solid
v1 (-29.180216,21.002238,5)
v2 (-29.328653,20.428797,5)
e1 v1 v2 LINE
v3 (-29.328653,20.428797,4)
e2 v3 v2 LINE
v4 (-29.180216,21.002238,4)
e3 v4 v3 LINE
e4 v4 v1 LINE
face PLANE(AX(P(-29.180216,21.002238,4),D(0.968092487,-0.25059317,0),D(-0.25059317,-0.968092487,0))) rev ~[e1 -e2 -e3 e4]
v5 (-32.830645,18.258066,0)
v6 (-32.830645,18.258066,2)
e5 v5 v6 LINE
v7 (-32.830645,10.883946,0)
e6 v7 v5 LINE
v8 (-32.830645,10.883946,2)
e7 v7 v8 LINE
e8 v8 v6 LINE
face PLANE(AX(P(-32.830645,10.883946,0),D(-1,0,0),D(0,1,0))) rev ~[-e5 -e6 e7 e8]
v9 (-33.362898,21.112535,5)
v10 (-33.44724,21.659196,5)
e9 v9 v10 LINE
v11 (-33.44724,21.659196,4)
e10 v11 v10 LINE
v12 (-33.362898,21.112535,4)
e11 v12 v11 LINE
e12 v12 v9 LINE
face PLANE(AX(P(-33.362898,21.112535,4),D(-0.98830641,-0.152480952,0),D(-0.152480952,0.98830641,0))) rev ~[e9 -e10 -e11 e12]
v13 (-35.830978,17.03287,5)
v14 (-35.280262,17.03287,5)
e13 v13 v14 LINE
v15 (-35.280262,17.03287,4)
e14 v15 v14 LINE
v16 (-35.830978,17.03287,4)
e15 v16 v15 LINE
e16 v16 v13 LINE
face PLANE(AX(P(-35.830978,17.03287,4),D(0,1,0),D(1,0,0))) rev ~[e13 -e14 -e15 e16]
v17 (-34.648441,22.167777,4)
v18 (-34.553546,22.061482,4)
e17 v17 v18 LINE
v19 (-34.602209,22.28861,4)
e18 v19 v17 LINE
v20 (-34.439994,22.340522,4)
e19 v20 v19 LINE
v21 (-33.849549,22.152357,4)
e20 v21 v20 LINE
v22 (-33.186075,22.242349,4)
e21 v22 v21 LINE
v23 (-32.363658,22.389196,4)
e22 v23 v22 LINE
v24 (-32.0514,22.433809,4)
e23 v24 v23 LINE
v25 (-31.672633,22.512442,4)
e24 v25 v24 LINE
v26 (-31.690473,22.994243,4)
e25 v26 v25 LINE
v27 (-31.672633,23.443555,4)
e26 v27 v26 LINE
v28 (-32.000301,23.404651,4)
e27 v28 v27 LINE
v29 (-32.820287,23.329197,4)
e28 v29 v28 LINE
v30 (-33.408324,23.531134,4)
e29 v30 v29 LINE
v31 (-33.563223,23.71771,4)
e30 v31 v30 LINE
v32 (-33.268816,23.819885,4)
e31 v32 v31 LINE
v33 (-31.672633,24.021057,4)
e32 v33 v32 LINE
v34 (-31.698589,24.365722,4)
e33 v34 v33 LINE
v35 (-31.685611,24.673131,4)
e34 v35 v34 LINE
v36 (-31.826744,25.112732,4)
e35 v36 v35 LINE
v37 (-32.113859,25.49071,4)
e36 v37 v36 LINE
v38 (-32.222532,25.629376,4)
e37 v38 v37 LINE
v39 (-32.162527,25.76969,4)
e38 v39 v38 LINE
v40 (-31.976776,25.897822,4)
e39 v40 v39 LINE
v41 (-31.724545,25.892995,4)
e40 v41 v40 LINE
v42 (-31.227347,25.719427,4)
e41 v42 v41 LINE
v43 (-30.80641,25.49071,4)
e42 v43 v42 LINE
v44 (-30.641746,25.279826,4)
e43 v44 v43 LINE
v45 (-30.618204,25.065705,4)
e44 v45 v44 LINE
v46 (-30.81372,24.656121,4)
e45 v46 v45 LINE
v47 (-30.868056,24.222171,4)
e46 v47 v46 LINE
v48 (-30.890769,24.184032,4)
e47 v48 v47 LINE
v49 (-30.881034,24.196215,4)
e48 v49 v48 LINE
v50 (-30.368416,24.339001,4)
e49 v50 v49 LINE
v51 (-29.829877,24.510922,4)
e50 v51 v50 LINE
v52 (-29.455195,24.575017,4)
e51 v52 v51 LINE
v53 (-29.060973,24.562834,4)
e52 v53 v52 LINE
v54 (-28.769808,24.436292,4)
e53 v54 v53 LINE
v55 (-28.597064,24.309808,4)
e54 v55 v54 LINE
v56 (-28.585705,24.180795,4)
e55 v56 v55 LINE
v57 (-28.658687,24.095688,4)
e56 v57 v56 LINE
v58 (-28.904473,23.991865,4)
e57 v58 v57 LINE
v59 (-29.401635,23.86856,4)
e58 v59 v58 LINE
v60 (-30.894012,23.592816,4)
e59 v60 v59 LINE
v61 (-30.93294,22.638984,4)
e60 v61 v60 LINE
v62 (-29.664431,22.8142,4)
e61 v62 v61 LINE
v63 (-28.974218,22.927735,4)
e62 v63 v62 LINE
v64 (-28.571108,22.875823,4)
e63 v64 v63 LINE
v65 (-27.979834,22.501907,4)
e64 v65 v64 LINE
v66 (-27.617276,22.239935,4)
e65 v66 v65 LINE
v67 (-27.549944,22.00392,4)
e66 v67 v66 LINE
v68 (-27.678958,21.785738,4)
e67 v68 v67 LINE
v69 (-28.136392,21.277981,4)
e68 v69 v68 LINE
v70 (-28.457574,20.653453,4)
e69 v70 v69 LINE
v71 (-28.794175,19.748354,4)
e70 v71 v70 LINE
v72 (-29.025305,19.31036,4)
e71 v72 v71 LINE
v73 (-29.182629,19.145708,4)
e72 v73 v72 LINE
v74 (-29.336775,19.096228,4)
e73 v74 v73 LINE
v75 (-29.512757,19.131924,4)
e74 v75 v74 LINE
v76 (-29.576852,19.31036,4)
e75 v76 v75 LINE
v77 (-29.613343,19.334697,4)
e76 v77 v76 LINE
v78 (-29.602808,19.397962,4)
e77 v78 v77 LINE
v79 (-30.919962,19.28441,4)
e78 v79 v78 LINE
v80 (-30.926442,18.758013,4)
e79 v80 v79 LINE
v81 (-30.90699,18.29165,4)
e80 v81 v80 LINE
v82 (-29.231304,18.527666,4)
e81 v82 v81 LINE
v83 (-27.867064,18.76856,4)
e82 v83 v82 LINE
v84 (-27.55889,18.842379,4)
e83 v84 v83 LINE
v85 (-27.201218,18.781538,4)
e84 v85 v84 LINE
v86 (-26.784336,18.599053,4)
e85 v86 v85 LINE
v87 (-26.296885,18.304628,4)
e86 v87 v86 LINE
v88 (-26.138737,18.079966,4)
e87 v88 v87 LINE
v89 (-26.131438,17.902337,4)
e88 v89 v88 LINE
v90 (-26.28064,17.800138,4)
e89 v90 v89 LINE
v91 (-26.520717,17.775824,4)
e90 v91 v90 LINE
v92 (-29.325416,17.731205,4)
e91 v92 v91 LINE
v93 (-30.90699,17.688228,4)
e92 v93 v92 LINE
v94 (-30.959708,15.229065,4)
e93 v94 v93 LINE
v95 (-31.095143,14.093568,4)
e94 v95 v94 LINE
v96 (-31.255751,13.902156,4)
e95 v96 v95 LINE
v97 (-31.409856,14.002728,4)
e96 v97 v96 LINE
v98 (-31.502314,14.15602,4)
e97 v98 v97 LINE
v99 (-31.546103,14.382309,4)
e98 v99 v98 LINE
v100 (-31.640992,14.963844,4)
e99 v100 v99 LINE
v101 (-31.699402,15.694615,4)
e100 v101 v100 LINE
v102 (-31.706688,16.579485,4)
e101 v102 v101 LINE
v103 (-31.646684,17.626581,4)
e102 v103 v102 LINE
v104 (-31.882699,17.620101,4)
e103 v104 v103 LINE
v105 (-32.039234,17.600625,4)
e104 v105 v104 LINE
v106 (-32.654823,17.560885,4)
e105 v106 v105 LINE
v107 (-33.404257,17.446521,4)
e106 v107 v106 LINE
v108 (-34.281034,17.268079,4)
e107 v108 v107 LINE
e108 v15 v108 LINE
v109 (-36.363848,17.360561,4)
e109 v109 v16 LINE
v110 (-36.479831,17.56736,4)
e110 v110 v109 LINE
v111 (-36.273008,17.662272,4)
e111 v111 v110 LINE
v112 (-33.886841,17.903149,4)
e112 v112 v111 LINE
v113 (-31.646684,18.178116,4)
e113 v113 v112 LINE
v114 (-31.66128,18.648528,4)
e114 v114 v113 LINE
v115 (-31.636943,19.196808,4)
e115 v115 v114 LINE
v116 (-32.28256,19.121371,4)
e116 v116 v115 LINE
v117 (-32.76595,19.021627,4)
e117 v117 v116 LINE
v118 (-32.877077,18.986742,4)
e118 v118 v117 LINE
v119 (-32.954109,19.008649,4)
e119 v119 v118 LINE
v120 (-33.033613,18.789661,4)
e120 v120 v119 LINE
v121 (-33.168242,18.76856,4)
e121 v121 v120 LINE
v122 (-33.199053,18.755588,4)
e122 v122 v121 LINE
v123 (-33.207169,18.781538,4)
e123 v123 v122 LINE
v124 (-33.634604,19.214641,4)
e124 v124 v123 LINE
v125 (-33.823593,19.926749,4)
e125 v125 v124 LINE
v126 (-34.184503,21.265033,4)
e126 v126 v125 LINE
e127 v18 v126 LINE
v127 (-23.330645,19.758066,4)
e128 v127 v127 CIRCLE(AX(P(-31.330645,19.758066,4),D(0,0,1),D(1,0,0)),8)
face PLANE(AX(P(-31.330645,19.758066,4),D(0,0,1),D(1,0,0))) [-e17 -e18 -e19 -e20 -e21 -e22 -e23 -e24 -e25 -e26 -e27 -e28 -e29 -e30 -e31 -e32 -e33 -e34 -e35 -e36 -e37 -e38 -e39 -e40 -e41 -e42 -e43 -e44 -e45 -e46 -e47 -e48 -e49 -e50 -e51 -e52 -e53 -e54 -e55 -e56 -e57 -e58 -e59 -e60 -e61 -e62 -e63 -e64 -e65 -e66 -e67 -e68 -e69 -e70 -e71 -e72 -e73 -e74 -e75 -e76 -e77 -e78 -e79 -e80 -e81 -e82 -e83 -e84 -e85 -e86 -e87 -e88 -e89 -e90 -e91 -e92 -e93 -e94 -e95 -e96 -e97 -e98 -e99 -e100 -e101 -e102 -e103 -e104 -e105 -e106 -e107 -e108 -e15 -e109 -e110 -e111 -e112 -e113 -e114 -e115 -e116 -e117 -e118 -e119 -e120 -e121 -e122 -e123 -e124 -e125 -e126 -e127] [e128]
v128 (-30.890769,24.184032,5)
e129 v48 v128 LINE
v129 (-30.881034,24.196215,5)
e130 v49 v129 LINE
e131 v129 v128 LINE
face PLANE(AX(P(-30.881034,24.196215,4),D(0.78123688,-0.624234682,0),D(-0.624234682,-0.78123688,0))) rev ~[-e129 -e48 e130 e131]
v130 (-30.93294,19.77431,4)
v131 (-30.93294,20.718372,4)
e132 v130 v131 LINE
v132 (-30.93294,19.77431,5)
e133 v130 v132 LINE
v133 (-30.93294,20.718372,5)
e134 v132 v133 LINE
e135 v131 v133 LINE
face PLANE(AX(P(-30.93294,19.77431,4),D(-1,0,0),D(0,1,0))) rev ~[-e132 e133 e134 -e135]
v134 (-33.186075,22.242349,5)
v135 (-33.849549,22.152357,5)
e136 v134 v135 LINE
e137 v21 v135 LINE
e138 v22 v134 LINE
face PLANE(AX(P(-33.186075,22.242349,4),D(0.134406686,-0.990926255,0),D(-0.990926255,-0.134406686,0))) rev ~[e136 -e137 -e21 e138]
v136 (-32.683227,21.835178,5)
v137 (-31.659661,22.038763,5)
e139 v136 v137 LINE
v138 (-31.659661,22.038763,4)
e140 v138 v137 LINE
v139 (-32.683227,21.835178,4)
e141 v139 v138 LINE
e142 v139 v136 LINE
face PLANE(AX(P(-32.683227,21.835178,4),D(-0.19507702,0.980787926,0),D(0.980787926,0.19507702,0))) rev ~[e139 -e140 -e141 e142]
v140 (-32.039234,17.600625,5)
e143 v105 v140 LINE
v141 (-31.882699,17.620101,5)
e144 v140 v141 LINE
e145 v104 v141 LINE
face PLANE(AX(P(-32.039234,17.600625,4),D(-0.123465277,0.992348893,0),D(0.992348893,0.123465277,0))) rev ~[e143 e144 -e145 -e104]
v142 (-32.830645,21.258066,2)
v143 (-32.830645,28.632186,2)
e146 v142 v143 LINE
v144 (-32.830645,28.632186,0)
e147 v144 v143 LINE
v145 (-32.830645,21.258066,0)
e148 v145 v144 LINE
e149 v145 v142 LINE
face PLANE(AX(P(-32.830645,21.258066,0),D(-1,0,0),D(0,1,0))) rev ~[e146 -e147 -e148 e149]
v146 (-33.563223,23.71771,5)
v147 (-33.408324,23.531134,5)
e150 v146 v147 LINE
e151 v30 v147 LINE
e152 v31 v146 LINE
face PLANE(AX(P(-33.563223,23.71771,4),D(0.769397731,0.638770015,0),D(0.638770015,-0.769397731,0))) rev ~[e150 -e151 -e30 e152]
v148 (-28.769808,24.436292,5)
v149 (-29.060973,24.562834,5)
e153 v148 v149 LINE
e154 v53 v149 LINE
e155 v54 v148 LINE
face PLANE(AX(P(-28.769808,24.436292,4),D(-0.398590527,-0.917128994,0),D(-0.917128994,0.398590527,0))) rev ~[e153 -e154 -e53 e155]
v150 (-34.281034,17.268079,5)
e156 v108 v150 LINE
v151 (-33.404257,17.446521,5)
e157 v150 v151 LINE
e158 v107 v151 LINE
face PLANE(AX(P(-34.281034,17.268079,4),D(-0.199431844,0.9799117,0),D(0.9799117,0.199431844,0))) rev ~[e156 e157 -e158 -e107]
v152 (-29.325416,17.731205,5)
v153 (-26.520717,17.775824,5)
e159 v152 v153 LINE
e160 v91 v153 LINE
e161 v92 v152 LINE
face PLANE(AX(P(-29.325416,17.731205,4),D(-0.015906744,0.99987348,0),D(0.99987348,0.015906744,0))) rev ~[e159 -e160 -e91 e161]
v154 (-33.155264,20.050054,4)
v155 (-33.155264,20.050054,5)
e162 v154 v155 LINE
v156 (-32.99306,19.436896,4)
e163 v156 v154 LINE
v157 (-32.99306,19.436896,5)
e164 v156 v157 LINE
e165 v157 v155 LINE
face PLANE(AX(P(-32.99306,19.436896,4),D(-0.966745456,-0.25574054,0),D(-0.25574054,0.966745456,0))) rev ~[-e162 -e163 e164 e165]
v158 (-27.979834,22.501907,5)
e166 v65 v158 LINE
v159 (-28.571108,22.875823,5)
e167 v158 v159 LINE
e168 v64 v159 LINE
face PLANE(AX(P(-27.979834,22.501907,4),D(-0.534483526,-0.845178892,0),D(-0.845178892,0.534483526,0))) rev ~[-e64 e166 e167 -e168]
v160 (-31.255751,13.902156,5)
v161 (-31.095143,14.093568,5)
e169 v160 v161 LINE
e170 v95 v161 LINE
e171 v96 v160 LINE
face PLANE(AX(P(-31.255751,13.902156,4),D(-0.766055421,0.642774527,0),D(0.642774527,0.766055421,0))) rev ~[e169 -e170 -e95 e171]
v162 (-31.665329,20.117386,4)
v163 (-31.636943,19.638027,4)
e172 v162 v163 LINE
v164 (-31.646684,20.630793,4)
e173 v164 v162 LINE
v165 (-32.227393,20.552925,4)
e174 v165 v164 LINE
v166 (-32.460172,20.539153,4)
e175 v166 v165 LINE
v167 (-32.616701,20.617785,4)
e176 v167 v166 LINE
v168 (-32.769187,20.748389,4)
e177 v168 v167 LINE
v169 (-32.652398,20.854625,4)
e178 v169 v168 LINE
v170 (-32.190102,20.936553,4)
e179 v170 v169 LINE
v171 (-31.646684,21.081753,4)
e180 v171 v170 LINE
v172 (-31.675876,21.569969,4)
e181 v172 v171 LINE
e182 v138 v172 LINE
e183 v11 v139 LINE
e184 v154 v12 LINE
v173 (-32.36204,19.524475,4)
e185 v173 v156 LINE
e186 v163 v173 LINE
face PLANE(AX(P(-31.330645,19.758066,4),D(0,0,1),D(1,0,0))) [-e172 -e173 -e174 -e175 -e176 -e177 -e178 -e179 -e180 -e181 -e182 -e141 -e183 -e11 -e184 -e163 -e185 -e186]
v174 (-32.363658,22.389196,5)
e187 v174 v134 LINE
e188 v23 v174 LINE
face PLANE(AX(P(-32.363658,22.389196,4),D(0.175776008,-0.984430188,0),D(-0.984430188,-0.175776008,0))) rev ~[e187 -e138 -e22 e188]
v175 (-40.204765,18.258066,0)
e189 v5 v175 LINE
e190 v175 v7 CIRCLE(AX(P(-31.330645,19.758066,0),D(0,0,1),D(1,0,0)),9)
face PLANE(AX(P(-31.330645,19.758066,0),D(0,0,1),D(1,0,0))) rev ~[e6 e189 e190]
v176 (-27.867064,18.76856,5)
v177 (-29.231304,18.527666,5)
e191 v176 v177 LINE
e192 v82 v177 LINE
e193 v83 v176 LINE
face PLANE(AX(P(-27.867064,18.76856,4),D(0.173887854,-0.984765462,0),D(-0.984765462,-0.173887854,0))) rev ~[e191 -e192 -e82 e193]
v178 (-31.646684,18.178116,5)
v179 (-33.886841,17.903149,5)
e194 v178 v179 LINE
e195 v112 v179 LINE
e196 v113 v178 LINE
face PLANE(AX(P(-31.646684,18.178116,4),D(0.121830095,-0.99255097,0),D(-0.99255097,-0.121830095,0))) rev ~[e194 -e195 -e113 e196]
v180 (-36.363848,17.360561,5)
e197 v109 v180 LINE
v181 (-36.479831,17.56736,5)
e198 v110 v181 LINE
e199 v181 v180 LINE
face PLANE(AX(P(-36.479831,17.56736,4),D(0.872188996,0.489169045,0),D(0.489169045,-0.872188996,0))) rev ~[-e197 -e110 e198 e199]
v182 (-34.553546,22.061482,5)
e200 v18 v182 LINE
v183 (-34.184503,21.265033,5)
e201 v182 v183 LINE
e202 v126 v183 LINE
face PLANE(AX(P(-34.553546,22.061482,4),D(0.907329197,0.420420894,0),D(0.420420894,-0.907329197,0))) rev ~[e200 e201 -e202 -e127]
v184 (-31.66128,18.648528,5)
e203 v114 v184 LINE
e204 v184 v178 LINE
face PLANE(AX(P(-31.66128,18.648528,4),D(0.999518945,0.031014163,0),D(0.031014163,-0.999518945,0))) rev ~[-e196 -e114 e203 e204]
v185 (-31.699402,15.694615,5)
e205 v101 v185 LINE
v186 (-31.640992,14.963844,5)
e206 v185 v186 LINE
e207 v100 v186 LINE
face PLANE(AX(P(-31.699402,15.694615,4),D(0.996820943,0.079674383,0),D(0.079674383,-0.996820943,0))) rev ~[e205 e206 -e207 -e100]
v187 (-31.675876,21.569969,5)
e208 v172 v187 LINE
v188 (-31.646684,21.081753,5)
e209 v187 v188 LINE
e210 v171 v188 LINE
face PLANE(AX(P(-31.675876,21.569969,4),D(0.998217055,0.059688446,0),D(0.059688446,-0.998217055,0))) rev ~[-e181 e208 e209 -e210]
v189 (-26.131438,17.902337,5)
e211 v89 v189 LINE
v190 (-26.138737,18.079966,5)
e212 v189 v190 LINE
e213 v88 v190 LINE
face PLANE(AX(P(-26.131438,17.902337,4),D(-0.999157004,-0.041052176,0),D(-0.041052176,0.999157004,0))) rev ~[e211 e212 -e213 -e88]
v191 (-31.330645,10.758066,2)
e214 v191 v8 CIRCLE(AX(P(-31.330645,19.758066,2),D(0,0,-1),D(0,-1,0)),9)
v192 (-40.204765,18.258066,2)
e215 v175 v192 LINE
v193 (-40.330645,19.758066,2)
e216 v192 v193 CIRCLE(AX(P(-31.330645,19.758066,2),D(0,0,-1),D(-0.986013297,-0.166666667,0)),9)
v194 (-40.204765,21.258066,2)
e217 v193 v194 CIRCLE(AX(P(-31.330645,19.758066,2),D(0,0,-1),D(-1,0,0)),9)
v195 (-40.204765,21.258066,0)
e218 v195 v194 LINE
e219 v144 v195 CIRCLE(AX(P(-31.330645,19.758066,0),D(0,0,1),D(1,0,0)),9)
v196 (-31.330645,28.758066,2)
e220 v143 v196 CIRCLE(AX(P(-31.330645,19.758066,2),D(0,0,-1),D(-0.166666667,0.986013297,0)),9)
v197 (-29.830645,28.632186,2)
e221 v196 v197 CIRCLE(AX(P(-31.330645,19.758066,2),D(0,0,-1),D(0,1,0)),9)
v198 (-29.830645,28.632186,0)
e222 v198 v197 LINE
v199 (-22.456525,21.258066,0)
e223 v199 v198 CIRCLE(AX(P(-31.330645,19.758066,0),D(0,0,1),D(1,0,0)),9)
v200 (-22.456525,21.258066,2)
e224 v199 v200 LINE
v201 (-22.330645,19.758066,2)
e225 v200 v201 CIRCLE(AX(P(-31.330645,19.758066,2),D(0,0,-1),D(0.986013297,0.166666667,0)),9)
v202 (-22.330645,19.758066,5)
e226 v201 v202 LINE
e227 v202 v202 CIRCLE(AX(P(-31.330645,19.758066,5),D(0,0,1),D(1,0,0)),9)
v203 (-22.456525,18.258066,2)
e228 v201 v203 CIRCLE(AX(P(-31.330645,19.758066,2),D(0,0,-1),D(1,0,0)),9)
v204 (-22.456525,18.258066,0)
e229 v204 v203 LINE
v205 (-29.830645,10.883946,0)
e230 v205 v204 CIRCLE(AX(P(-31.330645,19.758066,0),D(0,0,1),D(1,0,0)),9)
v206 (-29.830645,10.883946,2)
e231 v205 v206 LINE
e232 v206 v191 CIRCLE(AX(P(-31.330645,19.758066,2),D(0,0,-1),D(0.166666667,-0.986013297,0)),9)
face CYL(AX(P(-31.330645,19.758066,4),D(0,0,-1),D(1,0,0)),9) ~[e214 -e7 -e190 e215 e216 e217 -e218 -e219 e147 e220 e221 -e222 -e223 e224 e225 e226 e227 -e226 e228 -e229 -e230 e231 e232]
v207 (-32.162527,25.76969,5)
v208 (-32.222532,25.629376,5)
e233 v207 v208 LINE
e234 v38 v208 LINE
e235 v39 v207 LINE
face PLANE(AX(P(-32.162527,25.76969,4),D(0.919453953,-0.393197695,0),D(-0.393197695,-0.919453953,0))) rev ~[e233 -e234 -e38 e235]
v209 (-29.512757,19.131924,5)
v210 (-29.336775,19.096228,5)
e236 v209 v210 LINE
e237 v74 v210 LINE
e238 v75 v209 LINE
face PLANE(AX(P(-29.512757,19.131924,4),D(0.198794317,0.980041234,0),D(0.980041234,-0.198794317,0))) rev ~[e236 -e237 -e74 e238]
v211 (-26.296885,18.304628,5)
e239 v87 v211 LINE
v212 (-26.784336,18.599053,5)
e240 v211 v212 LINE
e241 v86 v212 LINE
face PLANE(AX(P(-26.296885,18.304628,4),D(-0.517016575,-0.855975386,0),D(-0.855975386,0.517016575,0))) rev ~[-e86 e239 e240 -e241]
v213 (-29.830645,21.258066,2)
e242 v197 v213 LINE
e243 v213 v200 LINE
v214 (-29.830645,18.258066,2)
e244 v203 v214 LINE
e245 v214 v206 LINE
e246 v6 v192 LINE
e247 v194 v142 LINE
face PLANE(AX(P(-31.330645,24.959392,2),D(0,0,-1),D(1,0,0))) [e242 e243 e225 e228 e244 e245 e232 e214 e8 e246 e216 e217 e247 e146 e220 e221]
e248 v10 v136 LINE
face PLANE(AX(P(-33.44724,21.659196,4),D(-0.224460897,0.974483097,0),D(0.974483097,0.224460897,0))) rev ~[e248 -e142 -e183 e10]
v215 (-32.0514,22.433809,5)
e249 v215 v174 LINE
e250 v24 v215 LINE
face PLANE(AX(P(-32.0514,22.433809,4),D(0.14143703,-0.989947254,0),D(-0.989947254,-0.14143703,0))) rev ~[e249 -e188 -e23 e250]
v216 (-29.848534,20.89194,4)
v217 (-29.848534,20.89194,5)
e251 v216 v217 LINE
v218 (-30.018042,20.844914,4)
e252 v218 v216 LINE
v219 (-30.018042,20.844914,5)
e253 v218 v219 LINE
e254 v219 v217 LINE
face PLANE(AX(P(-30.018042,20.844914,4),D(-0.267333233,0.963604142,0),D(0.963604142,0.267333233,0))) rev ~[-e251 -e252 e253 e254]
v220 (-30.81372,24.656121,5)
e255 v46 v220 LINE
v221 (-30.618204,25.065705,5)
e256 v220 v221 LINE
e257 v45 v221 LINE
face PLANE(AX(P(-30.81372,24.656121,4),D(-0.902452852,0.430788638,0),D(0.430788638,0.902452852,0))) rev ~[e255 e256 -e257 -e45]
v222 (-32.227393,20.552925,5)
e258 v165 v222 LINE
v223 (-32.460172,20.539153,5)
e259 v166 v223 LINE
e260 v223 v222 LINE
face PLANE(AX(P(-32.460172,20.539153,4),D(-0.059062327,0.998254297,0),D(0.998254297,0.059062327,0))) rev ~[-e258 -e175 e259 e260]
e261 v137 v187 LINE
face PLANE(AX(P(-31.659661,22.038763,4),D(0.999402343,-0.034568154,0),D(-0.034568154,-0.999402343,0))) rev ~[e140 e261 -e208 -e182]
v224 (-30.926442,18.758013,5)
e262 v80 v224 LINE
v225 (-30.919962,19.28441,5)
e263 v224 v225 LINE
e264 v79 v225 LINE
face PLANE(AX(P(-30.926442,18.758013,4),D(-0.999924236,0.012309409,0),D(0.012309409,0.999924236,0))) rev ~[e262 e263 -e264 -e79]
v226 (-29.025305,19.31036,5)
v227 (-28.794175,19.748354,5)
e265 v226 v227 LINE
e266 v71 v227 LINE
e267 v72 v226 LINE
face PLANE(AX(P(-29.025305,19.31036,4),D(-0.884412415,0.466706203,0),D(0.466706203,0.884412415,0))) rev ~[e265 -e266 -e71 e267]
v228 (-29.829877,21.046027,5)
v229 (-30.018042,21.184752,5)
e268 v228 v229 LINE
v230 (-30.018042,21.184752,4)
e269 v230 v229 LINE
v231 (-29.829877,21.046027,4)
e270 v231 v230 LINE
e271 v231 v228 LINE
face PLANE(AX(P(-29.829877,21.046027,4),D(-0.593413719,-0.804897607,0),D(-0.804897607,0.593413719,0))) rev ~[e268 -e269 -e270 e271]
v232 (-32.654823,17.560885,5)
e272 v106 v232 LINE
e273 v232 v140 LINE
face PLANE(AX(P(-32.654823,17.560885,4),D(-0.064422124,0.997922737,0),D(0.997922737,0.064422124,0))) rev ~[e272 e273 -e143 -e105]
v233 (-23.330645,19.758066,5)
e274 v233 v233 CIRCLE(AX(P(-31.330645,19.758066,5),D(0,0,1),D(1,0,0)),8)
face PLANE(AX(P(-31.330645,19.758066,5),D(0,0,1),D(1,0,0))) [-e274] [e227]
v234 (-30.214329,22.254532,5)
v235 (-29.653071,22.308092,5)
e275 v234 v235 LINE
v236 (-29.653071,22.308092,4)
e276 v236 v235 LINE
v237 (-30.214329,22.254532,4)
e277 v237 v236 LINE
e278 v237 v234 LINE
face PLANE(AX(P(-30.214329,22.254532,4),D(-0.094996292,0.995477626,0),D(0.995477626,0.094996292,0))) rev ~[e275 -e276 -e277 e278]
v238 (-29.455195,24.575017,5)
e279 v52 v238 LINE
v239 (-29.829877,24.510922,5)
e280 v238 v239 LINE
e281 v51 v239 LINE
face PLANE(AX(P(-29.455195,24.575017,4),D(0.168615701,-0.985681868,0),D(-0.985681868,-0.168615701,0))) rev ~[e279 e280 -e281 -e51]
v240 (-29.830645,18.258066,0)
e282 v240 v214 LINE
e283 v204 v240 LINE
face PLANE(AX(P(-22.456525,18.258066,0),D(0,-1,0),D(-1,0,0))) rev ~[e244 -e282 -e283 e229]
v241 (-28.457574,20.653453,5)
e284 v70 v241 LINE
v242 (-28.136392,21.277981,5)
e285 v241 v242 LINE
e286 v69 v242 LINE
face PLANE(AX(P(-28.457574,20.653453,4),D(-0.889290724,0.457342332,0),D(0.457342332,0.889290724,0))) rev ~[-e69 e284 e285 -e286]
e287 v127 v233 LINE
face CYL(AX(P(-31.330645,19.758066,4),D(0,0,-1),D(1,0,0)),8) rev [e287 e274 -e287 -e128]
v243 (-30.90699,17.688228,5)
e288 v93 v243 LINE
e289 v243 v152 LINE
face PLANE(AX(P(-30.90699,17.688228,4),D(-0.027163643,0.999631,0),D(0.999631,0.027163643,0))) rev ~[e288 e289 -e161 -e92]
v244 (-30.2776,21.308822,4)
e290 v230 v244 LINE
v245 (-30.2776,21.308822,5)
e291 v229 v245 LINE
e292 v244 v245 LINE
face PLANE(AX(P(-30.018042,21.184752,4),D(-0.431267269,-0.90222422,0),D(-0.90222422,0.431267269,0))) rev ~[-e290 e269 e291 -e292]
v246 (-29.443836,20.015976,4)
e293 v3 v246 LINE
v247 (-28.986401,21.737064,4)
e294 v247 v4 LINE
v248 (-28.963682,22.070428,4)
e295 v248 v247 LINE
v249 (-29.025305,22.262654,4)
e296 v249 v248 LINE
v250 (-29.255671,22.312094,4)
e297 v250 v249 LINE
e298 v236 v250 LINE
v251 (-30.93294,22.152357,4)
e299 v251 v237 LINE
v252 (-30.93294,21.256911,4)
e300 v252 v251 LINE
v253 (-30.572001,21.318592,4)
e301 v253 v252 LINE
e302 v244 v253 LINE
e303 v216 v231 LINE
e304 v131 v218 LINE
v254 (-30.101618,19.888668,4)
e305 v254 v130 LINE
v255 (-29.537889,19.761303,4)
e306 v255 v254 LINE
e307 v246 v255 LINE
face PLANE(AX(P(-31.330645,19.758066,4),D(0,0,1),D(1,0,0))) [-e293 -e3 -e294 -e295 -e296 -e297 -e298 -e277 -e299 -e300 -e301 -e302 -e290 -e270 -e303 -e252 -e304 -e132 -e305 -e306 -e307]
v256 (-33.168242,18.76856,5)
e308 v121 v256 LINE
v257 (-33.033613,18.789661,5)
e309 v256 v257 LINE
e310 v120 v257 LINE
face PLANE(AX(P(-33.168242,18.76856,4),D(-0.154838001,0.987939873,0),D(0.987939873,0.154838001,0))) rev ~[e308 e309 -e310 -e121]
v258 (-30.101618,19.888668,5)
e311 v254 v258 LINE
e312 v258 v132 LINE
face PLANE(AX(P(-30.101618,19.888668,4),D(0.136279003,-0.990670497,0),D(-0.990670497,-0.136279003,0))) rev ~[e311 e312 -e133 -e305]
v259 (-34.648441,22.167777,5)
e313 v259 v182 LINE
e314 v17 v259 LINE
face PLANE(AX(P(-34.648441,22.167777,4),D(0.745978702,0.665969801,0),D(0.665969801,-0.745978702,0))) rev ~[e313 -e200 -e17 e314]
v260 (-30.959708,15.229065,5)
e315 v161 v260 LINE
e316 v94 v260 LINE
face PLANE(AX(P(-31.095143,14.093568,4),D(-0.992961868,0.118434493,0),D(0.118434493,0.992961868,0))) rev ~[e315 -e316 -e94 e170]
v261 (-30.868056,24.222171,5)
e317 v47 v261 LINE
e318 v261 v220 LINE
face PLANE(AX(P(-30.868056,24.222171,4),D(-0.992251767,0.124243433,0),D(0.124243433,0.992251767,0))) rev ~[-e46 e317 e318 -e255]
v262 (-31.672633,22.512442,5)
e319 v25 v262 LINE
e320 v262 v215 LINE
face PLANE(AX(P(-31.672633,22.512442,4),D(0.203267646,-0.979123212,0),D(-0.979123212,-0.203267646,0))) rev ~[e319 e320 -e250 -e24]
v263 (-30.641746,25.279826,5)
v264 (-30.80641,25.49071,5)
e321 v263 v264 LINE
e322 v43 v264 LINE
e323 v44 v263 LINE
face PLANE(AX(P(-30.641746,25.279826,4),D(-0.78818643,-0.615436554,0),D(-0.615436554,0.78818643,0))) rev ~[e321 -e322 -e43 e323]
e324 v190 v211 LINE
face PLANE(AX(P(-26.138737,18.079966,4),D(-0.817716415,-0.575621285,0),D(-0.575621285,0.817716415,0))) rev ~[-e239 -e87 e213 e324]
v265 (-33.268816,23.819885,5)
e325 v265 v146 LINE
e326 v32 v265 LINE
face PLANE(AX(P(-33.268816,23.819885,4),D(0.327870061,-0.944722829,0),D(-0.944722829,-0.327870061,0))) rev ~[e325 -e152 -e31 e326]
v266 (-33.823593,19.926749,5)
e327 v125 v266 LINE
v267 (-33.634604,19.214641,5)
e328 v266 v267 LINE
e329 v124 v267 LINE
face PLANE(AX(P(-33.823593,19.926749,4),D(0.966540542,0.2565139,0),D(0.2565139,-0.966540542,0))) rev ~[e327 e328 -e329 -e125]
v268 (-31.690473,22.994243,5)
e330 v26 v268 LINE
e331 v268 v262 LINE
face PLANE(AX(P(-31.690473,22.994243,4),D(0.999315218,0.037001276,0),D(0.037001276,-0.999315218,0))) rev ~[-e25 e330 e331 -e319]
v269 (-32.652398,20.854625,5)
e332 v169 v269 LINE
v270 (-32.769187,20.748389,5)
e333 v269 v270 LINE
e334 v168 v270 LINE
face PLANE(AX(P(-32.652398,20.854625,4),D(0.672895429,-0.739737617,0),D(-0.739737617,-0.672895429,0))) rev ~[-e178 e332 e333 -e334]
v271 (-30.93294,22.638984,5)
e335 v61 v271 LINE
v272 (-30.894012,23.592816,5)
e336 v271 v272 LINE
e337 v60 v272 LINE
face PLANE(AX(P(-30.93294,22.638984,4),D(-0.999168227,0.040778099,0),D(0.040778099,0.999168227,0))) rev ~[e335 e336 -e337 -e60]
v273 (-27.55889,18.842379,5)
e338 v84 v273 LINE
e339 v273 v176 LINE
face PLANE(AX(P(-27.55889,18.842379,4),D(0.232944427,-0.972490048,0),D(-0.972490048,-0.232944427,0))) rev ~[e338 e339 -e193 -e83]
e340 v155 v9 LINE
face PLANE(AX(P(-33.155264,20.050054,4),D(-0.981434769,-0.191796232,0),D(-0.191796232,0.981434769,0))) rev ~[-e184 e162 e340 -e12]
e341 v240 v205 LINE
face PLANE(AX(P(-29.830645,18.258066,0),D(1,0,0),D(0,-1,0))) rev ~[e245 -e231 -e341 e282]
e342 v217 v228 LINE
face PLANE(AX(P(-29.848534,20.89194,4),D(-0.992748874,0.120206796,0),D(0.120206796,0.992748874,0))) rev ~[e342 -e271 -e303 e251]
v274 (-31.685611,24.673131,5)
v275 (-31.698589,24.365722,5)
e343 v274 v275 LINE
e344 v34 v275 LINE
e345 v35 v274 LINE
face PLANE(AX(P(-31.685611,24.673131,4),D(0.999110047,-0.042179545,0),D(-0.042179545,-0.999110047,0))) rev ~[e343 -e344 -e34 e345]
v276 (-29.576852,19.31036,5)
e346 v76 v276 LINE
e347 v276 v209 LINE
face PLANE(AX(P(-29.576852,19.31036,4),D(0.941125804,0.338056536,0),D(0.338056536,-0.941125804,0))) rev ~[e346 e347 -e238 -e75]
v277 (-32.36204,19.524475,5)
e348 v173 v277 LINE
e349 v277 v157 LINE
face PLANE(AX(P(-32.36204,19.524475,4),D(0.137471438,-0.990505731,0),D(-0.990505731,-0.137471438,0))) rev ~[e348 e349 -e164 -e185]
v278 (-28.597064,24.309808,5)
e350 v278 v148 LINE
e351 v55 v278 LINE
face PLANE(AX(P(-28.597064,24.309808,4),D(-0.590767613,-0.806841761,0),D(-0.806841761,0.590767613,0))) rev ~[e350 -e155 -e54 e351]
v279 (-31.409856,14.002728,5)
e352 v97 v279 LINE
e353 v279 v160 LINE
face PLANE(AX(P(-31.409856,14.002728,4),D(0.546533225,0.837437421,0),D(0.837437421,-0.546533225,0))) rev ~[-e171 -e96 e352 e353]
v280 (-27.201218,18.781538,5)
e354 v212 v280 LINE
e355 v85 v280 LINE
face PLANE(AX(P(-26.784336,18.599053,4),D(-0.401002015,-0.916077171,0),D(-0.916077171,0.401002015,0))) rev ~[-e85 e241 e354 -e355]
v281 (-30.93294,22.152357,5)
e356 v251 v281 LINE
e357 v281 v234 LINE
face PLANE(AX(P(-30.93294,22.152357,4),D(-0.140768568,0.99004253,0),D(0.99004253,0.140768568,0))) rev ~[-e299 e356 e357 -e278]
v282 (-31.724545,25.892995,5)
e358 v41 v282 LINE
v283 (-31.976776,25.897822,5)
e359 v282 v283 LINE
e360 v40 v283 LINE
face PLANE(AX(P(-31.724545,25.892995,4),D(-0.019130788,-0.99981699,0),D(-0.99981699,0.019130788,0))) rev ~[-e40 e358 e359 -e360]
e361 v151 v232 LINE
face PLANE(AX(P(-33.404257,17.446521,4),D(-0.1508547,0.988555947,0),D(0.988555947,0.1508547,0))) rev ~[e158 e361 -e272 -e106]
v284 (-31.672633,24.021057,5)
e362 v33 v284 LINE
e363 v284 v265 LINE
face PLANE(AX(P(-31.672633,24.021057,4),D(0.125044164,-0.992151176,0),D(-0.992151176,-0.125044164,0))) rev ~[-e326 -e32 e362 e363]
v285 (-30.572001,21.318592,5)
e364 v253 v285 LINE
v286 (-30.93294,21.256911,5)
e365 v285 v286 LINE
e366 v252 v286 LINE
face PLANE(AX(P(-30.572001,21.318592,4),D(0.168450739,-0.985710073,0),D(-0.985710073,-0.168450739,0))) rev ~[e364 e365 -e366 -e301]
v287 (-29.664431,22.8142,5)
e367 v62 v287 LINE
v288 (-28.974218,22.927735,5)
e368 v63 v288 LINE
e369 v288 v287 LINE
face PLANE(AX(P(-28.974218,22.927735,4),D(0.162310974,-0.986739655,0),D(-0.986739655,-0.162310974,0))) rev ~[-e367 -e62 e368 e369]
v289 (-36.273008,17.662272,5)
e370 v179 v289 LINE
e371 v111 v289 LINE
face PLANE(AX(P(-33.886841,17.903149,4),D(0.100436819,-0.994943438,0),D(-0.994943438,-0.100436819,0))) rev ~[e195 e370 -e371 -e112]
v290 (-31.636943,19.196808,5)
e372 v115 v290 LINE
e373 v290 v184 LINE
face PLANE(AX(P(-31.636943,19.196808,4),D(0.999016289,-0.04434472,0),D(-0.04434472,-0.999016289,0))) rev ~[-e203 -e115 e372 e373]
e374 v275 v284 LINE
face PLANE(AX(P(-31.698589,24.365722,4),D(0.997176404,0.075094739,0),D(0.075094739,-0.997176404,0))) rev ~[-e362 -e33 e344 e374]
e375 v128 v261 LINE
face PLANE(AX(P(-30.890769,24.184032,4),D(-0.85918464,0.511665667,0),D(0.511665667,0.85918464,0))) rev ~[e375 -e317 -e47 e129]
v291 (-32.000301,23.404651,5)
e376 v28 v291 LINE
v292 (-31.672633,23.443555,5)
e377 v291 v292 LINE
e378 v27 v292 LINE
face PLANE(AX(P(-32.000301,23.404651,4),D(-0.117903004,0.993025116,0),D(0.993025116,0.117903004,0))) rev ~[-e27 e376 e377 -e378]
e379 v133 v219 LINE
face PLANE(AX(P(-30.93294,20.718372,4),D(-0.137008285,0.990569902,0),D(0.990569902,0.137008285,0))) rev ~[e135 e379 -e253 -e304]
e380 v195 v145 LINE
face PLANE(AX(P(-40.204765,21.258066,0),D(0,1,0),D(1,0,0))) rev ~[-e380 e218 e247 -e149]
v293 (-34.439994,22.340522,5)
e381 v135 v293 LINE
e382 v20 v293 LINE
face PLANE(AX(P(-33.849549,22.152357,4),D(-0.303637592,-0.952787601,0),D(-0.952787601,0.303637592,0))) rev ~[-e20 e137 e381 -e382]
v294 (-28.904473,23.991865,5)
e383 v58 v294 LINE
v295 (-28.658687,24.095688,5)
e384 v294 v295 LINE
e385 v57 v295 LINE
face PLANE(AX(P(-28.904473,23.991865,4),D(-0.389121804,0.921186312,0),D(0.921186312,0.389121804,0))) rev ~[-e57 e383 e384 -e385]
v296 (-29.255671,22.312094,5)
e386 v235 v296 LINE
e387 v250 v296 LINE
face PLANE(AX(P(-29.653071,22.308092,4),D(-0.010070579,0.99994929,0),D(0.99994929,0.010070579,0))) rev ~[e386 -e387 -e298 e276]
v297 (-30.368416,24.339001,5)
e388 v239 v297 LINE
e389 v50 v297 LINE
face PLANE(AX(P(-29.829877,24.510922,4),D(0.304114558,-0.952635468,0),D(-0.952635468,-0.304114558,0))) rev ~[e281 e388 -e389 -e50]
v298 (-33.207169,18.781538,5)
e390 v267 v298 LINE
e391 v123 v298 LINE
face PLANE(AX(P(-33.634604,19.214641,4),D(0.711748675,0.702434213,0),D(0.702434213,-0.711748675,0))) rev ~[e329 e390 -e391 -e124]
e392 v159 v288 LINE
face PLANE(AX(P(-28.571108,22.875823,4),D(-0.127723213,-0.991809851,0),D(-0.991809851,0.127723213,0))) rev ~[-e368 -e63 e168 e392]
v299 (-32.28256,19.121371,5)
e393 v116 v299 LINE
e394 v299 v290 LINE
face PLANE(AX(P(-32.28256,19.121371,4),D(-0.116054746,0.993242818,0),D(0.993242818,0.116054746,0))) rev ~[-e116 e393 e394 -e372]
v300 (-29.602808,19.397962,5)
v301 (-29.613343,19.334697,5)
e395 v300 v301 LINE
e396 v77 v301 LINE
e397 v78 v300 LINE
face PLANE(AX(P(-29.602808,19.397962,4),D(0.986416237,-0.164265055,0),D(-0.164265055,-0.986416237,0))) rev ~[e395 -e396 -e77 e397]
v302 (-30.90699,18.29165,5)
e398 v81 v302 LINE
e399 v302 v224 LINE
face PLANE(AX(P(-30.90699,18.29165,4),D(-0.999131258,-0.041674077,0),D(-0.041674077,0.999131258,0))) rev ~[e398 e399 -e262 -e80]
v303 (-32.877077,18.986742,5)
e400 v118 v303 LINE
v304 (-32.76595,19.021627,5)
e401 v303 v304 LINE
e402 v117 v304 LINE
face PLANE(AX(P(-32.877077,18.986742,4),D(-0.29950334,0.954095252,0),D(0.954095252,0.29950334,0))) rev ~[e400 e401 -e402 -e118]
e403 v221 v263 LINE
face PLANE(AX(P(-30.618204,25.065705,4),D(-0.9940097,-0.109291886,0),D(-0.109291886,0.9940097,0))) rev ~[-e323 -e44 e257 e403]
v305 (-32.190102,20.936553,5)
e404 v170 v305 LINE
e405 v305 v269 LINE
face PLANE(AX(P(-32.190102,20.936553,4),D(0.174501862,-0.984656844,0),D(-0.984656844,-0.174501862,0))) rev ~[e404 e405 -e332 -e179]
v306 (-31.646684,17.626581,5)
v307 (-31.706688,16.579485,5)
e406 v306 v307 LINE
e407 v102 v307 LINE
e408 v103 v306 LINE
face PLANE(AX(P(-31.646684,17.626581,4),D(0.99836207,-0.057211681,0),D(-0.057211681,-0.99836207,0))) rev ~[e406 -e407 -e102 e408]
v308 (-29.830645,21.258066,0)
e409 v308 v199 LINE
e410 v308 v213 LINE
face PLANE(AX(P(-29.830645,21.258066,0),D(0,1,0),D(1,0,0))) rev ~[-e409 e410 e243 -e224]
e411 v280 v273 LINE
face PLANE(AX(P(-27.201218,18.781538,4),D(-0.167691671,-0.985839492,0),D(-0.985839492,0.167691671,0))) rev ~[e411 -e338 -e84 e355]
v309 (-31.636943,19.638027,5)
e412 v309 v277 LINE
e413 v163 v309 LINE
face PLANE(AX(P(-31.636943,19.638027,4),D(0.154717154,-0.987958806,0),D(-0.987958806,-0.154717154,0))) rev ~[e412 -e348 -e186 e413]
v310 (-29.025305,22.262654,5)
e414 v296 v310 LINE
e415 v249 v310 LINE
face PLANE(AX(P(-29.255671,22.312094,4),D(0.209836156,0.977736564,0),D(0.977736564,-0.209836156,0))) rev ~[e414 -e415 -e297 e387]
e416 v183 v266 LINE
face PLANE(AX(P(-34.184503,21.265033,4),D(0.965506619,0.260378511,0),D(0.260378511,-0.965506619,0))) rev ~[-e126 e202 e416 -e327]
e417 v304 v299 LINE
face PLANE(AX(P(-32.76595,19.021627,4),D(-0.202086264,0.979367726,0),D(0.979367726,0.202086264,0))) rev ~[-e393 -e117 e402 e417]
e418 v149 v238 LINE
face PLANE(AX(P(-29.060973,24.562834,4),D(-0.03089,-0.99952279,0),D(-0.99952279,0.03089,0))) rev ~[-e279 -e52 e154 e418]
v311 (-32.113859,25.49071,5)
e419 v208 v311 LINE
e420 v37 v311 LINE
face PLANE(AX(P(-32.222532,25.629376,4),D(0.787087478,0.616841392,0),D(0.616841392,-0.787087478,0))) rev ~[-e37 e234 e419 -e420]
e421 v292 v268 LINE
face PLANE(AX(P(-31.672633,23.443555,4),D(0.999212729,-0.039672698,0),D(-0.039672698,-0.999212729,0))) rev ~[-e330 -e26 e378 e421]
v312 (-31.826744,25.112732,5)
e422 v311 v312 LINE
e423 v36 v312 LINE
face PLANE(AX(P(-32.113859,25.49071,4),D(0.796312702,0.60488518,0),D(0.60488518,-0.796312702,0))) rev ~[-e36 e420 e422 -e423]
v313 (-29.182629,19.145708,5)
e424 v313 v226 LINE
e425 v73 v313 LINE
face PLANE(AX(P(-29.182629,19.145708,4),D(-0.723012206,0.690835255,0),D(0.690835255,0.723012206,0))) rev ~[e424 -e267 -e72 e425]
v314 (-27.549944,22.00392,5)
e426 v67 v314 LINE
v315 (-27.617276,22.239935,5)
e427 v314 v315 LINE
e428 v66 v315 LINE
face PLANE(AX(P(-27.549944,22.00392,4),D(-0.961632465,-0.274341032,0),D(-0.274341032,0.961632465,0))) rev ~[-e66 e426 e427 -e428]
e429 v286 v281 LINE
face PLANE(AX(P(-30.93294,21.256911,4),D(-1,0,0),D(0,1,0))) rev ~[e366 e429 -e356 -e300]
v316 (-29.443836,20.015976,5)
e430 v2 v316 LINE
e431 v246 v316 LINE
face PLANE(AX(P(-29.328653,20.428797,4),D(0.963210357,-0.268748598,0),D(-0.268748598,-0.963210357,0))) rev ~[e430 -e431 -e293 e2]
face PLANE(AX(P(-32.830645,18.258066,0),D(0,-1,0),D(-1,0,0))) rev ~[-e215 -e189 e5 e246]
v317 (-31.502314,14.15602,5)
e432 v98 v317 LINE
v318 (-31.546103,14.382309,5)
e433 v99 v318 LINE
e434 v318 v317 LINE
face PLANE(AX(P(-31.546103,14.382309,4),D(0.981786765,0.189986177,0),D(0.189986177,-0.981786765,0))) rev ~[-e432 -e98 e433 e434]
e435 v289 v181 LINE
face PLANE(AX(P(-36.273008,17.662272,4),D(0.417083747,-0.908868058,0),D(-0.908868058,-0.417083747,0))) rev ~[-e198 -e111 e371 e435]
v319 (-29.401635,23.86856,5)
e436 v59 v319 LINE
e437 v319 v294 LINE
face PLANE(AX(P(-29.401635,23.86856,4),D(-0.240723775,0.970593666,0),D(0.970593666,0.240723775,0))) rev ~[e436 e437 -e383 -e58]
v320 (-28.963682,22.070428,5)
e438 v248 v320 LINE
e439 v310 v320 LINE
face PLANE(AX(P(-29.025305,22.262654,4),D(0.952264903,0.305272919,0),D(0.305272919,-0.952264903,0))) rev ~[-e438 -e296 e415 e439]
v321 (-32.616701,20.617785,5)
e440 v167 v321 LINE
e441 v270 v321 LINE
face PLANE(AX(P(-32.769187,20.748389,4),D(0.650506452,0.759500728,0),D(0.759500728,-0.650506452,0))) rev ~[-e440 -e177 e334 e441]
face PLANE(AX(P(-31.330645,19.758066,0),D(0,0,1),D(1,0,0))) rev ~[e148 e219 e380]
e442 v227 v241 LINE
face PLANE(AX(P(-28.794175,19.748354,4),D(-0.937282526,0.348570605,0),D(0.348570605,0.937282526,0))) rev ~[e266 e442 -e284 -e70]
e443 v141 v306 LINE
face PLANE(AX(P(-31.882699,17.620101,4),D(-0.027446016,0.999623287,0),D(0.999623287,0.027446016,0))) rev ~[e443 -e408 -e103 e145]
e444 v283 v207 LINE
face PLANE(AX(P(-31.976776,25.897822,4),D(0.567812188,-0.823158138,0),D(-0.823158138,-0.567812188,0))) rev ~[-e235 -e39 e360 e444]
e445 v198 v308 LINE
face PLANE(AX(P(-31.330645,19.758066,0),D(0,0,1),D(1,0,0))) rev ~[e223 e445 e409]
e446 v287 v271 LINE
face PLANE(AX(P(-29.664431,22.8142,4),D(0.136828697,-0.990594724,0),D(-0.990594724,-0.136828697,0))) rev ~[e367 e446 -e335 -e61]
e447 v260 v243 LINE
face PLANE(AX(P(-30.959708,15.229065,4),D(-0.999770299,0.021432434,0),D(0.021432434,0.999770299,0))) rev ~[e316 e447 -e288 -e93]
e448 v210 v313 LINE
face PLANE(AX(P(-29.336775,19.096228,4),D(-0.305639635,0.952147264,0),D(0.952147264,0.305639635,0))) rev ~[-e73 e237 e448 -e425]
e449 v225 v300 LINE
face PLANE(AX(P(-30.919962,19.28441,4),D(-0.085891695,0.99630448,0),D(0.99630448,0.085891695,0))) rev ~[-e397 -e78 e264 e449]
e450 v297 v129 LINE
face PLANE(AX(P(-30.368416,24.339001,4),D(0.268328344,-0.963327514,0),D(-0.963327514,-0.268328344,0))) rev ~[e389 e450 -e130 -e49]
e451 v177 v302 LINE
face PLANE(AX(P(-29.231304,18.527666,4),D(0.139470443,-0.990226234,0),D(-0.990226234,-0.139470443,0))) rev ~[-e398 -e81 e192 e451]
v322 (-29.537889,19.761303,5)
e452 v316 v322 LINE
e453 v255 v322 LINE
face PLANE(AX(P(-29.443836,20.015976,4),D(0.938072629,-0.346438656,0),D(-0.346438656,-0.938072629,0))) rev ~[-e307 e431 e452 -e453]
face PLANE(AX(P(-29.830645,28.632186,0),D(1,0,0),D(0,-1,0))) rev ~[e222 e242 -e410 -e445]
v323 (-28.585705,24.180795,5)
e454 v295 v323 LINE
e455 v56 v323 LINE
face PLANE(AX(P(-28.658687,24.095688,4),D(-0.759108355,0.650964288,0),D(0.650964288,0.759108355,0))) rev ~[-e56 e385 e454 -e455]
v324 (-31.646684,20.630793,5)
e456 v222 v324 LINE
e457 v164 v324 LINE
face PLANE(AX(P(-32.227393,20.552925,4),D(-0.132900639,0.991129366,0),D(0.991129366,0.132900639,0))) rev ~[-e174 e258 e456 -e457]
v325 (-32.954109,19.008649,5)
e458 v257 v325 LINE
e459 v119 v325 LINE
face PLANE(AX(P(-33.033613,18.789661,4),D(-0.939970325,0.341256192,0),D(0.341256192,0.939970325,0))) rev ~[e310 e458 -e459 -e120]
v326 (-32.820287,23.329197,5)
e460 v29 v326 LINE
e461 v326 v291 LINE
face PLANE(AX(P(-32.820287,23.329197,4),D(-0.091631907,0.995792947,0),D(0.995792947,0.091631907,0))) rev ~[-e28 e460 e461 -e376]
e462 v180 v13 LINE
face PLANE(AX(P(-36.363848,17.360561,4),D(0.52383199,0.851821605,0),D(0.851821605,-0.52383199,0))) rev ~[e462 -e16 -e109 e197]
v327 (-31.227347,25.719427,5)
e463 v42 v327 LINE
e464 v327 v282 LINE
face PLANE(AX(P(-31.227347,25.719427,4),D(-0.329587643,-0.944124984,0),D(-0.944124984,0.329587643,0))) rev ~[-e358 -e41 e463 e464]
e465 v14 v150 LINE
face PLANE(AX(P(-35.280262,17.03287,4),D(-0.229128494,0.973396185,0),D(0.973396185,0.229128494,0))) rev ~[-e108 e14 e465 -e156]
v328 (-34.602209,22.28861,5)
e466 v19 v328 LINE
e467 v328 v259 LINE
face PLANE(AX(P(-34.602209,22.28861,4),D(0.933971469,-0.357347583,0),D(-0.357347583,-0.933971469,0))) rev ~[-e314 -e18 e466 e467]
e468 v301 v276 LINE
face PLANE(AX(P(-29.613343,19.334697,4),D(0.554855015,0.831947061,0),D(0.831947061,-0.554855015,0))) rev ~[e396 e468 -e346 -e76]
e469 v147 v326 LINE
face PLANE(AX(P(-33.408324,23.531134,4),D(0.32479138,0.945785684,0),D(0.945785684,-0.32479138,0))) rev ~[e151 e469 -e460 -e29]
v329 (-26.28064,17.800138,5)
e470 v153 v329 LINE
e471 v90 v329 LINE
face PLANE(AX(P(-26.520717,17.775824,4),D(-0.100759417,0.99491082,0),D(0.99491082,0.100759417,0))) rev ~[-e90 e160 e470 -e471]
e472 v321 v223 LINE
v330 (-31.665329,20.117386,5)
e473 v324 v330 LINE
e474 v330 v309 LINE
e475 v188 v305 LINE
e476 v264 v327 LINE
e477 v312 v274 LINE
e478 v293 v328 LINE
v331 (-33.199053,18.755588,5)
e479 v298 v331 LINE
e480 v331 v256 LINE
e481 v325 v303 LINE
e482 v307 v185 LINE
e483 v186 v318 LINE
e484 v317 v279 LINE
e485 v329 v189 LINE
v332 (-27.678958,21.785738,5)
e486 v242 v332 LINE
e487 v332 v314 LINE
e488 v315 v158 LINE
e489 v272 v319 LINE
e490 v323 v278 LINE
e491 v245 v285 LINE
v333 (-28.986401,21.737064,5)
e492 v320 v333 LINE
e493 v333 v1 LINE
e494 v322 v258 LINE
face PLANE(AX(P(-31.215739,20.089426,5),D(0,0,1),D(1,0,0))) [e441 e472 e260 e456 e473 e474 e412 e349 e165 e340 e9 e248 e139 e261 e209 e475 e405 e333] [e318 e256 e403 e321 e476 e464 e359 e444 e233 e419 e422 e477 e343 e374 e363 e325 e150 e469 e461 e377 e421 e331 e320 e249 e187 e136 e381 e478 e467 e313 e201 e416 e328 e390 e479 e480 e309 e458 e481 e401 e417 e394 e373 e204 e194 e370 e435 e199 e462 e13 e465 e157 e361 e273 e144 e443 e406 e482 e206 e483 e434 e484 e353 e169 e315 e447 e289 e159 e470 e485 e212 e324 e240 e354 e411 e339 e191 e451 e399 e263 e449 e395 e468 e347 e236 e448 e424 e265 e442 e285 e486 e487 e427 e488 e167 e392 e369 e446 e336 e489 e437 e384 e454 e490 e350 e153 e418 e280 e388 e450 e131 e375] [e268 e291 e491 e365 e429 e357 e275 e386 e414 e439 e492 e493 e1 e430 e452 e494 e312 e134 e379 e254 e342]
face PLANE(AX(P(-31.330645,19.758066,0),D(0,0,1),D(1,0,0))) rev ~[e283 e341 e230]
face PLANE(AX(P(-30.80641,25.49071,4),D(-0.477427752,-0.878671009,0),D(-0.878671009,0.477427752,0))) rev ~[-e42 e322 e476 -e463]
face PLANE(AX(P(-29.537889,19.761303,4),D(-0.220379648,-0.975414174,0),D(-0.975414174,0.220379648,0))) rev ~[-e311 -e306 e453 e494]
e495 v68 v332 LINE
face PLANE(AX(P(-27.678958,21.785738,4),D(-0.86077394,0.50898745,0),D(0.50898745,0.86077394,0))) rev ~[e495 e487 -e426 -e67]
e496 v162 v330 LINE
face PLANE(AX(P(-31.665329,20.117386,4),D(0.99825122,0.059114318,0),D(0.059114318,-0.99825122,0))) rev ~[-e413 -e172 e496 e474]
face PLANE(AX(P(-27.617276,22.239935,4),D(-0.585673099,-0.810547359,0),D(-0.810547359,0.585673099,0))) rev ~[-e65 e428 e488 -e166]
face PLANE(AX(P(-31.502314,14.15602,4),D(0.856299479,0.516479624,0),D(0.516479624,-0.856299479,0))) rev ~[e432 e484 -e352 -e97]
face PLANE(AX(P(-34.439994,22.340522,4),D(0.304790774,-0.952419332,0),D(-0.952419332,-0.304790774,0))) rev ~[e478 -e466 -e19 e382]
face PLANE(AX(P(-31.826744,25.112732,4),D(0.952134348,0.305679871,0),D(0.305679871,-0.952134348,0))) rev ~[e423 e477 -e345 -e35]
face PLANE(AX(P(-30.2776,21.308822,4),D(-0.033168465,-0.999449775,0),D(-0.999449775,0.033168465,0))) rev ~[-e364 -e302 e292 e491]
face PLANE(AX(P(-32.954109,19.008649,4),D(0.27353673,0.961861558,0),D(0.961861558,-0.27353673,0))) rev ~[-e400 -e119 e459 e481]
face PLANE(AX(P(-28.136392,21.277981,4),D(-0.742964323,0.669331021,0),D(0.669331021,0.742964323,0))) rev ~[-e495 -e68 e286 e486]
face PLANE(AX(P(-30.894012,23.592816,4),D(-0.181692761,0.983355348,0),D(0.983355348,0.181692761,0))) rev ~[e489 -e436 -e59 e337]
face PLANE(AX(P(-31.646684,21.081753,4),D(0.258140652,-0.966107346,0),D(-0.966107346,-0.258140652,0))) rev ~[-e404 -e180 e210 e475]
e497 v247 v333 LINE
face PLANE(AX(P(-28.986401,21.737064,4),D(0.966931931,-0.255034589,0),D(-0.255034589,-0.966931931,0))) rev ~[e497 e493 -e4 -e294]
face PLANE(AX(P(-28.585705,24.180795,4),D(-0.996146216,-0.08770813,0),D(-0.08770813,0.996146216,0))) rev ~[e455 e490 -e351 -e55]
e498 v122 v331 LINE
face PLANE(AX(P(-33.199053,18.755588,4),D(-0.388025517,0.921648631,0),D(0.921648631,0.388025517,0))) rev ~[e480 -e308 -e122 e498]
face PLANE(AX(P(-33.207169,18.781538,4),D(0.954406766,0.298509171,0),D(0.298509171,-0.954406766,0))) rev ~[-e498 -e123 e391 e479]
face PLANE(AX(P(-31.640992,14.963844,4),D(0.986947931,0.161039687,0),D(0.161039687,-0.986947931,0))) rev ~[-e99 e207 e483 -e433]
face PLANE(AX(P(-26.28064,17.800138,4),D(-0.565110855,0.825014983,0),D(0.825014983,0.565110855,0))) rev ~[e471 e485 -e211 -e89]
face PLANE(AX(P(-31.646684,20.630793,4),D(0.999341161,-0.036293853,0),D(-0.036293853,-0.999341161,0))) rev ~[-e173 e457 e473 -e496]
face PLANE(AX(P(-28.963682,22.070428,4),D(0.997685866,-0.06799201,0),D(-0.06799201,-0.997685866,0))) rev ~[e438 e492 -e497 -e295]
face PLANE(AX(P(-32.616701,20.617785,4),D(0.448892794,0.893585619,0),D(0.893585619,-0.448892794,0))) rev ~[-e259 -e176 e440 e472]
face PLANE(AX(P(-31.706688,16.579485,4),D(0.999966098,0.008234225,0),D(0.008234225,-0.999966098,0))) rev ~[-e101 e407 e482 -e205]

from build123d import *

# Parameters (mm, degrees)
F0_R     = 9
F1_DEPTH = 4
F3_W     = 3
F3_H     = 3
F4_DEPTH = 2
F2_R     = 9
F2_R_2   = 8
F5_DEPTH = 1
F7_DEPTH = 1


# Not quite as in the source:
# - a feature names something its author has since deleted; it is built from what else it names


with BuildPart() as f1:
    # F0 (on Top) → F1 (new body)
    with BuildSketch(Plane.XY):
        with Locations((-31.3306450844, 19.7580661625)):
            Circle(F0_R)
    extrude(amount=F1_DEPTH)

    # F3 (on face) → F4 (cut)
    with BuildSketch(Plane(origin=(0, 0, 0), x_dir=(1, 0, 0), z_dir=(0, 0, -1))):
        with BuildLine():
            ThreePointArc((-32.8306450844, -28.6321858371), (-32.0832814269, -28.7265408676), (-31.3306450844, -28.7580661625))
            ThreePointArc((-31.3306450844, -28.7580661625), (-30.5780087419, -28.7265408676), (-29.8306450844, -28.6321858371))
            Line((-29.8306450844, -28.6321858371), (-29.8306450844, -21.2580661625))
            Line((-29.8306450844, -21.2580661625), (-32.8306450844, -21.2580661625))
            Line((-32.8306450844, -21.2580661625), (-32.8306450844, -28.6321858371))
        make_face()
        with BuildLine():
            ThreePointArc((-40.204764759, -18.2580661625), (-40.2991197895, -19.0054298199), (-40.3306450844, -19.7580661625))
            ThreePointArc((-40.3306450844, -19.7580661625), (-40.2991197895, -20.510702505), (-40.204764759, -21.2580661625))
            Line((-40.204764759, -21.2580661625), (-32.8306450844, -21.2580661625))
            Line((-32.8306450844, -21.2580661625), (-32.8306450844, -18.2580661625))
            Line((-32.8306450844, -18.2580661625), (-40.204764759, -18.2580661625))
        make_face()
        with Locations((-31.3306450844, -19.7580661625)):
            Rectangle(F3_W, F3_H)
        with BuildLine():
            Line((-29.8306450844, -18.2580661625), (-29.8306450844, -21.2580661625))
            Line((-29.8306450844, -21.2580661625), (-22.4565254097, -21.2580661625))
            ThreePointArc((-22.4565254097, -21.2580661625), (-22.3621703793, -20.510702505), (-22.3306450844, -19.7580661625))
            ThreePointArc((-22.3306450844, -19.7580661625), (-22.3621703793, -19.0054298199), (-22.4565254097, -18.2580661625))
            Line((-22.4565254097, -18.2580661625), (-29.8306450844, -18.2580661625))
        make_face()
        with BuildLine():
            Line((-32.8306450844, -10.8839464878), (-32.8306450844, -18.2580661625))
            Line((-32.8306450844, -18.2580661625), (-29.8306450844, -18.2580661625))
            Line((-29.8306450844, -18.2580661625), (-29.8306450844, -10.8839464878))
            ThreePointArc((-29.8306450844, -10.8839464878), (-30.5780087419, -10.7895914574), (-31.3306450844, -10.7580661625))
            ThreePointArc((-31.3306450844, -10.7580661625), (-32.0832814269, -10.7895914574), (-32.8306450844, -10.8839464878))
        make_face()
    extrude(amount=-F4_DEPTH, mode=Mode.SUBTRACT)

    # F2 (on face) → F5 (join)
    with BuildSketch(Plane.XY.offset(4)):
        with Locations((-31.3306450844, 19.7580661625)):
            Circle(F2_R)
        with Locations((-31.3306450844, 19.7580661625)):
            Circle(F2_R_2, mode=Mode.SUBTRACT)
    extrude(amount=F5_DEPTH)

    # F6 (on face) → F7 (join)
    with BuildSketch(Plane.XY.offset(4)):
        Polygon((-31.8826989997, 17.620101061), (-31.6466835645, 17.6265811855), (-31.7066879875, 16.579484876), (-31.6994015259, 15.6946153355), (-31.6409921199, 14.9638444516), (-31.5461033208, 14.3823088935), (-31.5023139233, 14.1560195308), (-31.4098559066, 14.0027283885), (-31.2557513645, 13.9021557962), (-31.0951431551, 14.0935678455), (-30.9597079636, 15.2290645897), (-30.9069900022, 17.6882277109), (-29.3254158456, 17.7312048856), (-26.5207167102, 17.7758241628), (-26.2806401616, 17.8001378726), (-26.131438384, 17.902336676), (-26.1387366169, 18.0799662479), (-26.2968846155, 18.3046282224), (-26.7843359457, 18.5990530635), (-27.2012180722, 18.7815383146), (-27.5588903414, 18.842378503), (-27.8670641117, 18.7685604085), (-29.2313039551, 18.5276657515), (-30.9069900022, 18.2916503163), (-30.9264421472, 18.7580132848), (-30.9199620226, 19.2844101047), (-29.6028075528, 19.3979623688), (-29.6133429052, 19.3346972837), (-29.5768517406, 19.3103600312), (-29.5127567758, 19.1319241223), (-29.336775192, 19.0962275234), (-29.1826294501, 19.1457083654), (-29.0253054456, 19.3103600312), (-28.7941751179, 19.7483540621), (-28.4575735534, 20.6534526562), (-28.1363924487, 21.2779812803), (-27.6789580441, 21.7857381779), (-27.5499441205, 22.0039200278), (-27.6172762047, 22.239935463), (-27.9798335815, 22.5019067104), (-28.5711081605, 22.8758234335), (-28.9742178152, 22.9277350579), (-29.6644305355, 22.8142004508), (-30.9329399287, 22.6389840043), (-30.8940120961, 23.59281596), (-29.4016352941, 23.8685596792), (-28.9044726056, 23.9918645013), (-28.6586869554, 24.0956877501), (-28.5857046263, 24.1807945629), (-28.5970639727, 24.3098084866), (-28.7698084371, 24.4362915714), (-29.0609726161, 24.562833513), (-29.4551949066, 24.5750168534), (-29.829876767, 24.5109218886), (-30.3684157276, 24.3390014182), (-30.88103419, 24.1962150228), (-30.890769091, 24.1840316823), (-30.8680562839, 24.222170835), (-30.8137197628, 24.6561214094), (-30.6182036345, 25.065705303), (-30.6417463214, 25.2798260395), (-30.8064097585, 25.4907096565), (-31.2273471128, 25.7194268588), (-31.7245451154, 25.8929953172), (-31.9767755761, 25.897821568), (-32.162527375, 25.7696904951), (-32.222531798, 25.6293760818), (-32.1138587557, 25.4907096565), (-31.8267439188, 25.1127318199), (-31.6856113971, 24.6731310006), (-31.6985893032, 24.3657223677), (-31.672633491, 24.021057433), (-33.2688158848, 23.8198851742), (-33.5632230689, 23.7177099135), (-33.4083239611, 23.5311341206), (-32.8202865015, 23.3291967246), (-32.0003006059, 23.4046510358), (-31.672633491, 23.4435553257), (-31.6904729619, 22.9942431481), (-31.672633491, 22.5124420627), (-32.0514000076, 22.4338094888), (-32.363658434, 22.3891960973), (-33.186075112, 22.2423485884), (-33.8495492258, 22.1523566681), (-34.4399939251, 22.3405215924), (-34.6022089228, 22.288609968), (-34.648440874, 22.167777128), (-34.5535461892, 22.0614818971), (-34.1845028022, 21.2650328026), (-33.8235934136, 19.9267487714), (-33.6346044953, 19.2146413523), (-33.2071693594, 18.7815383146), (-33.1990530181, 18.7555883881), (-33.1682415268, 18.7685604085), (-33.0336126723, 18.7896605415), (-32.954109019, 19.0086487285), (-32.8770773478, 18.9867422584), (-32.7659499804, 19.0216266346), (-32.2825597636, 19.1213711129), (-31.6369427778, 19.1968077671), (-31.6612800303, 18.6485280198), (-31.6466835645, 18.1781157092), (-33.8868408417, 17.9031488987), (-36.2730075081, 17.6622718987), (-36.4798311888, 17.5673595569), (-36.3638475537, 17.360560596), (-35.8309782607, 17.0328699384), (-35.2802618454, 17.0328699384), (-34.2810337038, 17.2680790366), (-33.4042569619, 17.4465208312), (-32.654822613, 17.560885318), (-32.0392343242, 17.6006253733), align=None)
        Polygon((-31.6758764961, 21.5699694534), (-31.6466835645, 21.0817529858), (-32.1901017469, 20.936553465), (-32.6523977163, 20.8546249149), (-32.7691870998, 20.7483885407), (-32.6167011174, 20.6177854857), (-32.4601716785, 20.5391529118), (-32.2273933628, 20.5529253835), (-31.6466835645, 20.6307928201), (-31.6653293724, 20.1173856777), (-31.6369427778, 19.6380271461), (-32.3620398743, 19.524474882), (-32.9930603943, 19.4368960871), (-33.1552636207, 20.0500535935), (-33.3628983469, 21.1125350488), (-33.4472400224, 21.6591962363), (-32.6832268646, 21.8351778202), (-31.6596614706, 22.0387632043), align=None, mode=Mode.SUBTRACT)
        Polygon((-30.9329399287, 19.7743098743), (-30.9329399287, 20.718371615), (-30.0180416913, 20.8449135566), (-29.8485343463, 20.8919400735), (-29.829876767, 21.0460269586), (-30.0180416913, 21.1847522406), (-30.2775998133, 21.3088222), (-30.5720011117, 21.318592415), (-30.9329399287, 21.2569105756), (-30.9329399287, 22.1523566681), (-30.2143288425, 22.2545319288), (-29.6530711891, 22.3080915413), (-29.2556706359, 22.3120937981), (-29.0253054456, 22.2626541558), (-28.9636824629, 22.070428118), (-28.9864011556, 21.7370636729), (-29.1802163247, 21.0022375611), (-29.328652965, 20.4287965674), (-29.4438355602, 20.0159755543), (-29.537888594, 19.7613025399), (-30.1016182294, 19.8886684755), align=None, mode=Mode.SUBTRACT)
    extrude(amount=F7_DEPTH)


solid = f1.part
